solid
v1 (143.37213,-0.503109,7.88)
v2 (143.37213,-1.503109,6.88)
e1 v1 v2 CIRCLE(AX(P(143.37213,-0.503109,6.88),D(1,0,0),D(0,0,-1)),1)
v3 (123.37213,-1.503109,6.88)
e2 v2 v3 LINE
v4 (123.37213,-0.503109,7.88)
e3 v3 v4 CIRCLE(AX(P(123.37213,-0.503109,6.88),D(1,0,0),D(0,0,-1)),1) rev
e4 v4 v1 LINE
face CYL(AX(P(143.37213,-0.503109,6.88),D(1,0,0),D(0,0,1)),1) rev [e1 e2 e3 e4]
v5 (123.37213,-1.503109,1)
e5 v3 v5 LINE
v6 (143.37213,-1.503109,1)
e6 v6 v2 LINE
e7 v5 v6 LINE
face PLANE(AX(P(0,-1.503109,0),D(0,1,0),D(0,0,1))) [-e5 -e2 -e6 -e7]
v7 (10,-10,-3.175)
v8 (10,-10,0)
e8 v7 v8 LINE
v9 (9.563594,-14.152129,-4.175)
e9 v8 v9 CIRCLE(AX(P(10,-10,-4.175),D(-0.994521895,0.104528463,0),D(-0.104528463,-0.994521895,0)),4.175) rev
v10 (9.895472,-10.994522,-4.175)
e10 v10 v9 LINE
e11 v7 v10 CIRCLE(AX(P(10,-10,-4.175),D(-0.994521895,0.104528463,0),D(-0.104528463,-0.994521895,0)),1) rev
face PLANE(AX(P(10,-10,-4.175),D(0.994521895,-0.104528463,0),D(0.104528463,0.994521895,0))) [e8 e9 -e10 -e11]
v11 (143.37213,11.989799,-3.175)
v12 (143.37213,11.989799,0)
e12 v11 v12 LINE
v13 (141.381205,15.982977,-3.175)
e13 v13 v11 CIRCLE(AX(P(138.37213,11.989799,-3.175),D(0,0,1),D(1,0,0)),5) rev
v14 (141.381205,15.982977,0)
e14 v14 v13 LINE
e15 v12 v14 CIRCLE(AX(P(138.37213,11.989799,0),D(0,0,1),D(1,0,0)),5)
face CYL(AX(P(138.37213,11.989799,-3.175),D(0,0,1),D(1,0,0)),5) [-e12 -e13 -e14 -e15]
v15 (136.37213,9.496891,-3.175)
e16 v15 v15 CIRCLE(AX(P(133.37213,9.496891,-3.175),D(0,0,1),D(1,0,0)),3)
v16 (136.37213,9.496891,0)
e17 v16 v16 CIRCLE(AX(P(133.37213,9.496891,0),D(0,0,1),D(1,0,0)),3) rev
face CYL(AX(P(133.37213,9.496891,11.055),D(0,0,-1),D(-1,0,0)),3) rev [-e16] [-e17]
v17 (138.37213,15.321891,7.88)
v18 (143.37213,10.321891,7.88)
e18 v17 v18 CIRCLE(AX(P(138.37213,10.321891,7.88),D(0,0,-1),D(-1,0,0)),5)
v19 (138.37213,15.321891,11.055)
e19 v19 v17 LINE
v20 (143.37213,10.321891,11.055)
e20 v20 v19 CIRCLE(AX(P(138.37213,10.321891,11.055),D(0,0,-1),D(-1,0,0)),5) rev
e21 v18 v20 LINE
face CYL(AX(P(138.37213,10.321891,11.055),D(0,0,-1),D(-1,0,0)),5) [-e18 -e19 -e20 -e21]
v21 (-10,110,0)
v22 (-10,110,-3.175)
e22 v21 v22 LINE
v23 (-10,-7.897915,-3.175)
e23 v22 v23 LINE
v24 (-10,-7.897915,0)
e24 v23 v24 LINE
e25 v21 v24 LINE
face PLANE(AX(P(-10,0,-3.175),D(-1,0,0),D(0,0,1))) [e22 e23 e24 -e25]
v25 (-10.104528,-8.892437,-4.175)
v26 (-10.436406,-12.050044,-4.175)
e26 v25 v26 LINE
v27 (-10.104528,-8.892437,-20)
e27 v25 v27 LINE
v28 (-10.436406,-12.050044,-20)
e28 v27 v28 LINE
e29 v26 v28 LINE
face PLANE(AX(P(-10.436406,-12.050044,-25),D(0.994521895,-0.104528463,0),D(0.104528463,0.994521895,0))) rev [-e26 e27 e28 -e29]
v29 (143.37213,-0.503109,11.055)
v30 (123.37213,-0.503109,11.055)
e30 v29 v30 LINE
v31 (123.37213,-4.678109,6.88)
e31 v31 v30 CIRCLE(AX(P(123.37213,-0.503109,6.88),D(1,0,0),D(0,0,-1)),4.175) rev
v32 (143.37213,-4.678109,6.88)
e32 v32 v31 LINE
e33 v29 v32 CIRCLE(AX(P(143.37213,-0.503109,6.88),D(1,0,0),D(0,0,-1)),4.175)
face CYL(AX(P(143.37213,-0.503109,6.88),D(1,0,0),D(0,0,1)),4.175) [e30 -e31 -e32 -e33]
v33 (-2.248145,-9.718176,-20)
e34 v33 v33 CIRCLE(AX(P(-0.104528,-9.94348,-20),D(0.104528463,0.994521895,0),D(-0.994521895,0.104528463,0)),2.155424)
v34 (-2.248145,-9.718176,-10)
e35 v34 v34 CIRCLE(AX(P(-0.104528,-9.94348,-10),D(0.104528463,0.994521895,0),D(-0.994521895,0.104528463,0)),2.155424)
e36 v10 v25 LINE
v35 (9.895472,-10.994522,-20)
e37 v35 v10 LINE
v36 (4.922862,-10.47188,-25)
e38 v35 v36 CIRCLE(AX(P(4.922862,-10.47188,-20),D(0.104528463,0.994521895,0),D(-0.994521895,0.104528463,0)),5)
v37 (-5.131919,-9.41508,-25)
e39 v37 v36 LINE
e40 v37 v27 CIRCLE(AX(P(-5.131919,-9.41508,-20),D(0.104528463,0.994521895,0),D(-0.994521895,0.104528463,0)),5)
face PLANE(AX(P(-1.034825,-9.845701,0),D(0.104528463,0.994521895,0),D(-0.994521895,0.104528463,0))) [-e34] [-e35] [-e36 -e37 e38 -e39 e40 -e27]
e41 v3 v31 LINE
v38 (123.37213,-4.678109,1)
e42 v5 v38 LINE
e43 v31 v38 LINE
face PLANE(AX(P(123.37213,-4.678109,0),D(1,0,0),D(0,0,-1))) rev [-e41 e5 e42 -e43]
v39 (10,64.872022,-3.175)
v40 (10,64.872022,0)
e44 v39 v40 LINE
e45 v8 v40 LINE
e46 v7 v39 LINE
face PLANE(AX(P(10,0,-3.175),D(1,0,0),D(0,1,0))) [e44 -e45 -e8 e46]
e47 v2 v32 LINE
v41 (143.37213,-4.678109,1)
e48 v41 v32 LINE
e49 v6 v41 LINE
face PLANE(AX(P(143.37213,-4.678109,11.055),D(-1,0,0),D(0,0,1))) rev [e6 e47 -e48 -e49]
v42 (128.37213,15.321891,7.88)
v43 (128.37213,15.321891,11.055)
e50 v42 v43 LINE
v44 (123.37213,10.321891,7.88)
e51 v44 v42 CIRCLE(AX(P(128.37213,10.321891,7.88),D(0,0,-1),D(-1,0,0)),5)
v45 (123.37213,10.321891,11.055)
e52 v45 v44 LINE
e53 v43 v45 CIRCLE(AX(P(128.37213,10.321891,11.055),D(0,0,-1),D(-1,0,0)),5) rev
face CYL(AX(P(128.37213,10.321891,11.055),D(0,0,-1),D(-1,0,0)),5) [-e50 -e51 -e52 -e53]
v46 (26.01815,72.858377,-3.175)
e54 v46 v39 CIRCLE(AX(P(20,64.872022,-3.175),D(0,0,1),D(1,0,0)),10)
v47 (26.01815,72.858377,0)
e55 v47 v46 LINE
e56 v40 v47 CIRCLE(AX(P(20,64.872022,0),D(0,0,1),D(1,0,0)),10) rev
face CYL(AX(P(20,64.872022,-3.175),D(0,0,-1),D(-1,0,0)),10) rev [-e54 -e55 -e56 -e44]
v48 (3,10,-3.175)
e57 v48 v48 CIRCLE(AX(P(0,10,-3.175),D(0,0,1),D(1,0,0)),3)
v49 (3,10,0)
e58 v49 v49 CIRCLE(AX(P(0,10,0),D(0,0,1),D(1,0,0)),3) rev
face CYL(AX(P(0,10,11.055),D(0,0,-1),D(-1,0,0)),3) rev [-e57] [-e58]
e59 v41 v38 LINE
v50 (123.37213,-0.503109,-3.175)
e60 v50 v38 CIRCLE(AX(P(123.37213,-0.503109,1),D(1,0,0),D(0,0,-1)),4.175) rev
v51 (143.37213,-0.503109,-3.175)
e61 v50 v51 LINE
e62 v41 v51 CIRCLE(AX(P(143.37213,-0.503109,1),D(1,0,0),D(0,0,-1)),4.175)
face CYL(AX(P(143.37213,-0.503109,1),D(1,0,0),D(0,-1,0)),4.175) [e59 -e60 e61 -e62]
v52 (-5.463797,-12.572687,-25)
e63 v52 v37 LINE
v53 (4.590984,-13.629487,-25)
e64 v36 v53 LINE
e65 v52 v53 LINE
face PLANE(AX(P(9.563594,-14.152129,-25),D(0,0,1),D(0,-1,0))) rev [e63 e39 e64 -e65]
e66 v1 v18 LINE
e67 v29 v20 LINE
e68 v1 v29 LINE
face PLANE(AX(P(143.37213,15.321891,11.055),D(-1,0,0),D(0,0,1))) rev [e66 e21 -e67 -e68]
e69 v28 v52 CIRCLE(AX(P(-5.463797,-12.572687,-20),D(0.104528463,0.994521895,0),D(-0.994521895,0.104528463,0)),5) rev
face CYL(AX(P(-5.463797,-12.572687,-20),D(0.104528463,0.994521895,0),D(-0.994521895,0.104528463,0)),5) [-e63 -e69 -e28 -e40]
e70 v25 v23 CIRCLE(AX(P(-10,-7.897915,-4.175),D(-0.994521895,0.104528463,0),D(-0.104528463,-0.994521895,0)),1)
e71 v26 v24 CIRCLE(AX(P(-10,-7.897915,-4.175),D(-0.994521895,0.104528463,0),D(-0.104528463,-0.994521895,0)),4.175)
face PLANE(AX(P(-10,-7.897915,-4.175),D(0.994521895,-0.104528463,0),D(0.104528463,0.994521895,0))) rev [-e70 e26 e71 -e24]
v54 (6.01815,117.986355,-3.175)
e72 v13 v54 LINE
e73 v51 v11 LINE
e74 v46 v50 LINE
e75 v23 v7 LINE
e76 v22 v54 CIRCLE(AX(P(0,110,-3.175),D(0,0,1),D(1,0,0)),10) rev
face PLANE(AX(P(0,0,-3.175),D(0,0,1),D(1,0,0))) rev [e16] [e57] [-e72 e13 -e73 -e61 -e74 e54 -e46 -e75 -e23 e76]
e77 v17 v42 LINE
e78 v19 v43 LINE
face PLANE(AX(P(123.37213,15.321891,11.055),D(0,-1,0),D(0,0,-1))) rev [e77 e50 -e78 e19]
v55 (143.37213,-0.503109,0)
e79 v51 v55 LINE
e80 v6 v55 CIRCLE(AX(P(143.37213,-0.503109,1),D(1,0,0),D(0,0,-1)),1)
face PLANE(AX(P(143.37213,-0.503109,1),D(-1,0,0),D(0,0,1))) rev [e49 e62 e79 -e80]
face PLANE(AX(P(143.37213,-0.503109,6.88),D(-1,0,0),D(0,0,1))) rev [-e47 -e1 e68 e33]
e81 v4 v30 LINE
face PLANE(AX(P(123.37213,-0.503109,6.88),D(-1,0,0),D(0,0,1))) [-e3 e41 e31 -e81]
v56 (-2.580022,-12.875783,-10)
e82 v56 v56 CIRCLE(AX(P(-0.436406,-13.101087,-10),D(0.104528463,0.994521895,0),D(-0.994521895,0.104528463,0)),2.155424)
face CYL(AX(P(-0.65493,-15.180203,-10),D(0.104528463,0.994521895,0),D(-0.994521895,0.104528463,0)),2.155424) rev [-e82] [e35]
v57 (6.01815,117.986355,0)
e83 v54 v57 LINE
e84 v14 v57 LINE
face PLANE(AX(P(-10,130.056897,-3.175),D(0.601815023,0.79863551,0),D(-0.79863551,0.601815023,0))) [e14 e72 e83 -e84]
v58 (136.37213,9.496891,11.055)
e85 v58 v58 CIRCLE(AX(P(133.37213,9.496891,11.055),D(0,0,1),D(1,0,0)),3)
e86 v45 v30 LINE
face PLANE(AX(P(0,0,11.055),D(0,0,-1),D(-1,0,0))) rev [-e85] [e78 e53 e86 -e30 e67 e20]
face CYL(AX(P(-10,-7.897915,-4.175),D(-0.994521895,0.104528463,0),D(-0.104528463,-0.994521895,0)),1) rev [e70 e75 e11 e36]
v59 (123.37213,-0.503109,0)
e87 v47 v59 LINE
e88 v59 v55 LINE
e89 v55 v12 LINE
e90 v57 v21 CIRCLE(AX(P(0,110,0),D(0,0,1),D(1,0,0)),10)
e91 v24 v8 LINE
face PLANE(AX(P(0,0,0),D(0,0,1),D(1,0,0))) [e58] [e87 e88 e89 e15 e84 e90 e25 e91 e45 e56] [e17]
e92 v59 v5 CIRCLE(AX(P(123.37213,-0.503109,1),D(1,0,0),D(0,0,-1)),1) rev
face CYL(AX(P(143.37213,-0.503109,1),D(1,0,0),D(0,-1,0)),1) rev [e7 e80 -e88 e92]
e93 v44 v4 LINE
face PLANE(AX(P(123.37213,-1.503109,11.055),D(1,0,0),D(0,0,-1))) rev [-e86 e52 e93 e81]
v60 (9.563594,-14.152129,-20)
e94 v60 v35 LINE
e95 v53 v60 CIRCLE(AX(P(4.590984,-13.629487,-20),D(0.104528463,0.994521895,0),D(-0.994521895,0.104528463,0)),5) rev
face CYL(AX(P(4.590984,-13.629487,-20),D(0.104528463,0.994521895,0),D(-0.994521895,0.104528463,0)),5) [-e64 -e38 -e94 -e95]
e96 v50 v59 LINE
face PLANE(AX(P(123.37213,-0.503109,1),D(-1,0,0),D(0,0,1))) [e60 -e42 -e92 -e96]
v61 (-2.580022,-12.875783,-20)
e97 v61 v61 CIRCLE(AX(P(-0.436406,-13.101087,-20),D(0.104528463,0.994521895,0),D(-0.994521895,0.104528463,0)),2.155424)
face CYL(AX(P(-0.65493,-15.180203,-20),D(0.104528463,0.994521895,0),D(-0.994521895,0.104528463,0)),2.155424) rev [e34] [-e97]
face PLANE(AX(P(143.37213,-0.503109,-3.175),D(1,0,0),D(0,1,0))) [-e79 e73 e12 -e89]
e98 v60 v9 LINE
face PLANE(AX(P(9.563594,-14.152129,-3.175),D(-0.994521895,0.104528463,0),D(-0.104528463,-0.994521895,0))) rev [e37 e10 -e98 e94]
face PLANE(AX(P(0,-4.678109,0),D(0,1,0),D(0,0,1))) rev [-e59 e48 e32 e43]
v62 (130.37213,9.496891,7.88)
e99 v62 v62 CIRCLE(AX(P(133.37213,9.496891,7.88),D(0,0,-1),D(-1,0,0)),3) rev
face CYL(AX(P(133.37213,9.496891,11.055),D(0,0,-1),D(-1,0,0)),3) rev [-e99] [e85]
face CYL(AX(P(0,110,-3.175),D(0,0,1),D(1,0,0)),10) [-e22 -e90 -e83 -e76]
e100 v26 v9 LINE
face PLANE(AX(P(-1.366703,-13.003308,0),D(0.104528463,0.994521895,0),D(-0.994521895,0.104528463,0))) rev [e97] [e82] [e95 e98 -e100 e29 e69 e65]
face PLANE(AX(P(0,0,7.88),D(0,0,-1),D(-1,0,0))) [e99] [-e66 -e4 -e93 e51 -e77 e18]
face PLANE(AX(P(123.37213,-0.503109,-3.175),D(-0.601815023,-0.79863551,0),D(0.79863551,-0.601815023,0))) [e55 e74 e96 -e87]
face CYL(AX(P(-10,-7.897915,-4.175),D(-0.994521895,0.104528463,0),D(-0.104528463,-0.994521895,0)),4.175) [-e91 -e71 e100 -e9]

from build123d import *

# Parameters (mm, degrees)
BASE_FLANGE1_DEPTH           = 3.175
EDGE_FLANGE3_DEPTH           = 20
EDGE_FLANGE4_STRIP_W         = 14.7
EDGE_FLANGE4_STRIP_H         = 3.175
EDGE_FLANGE4_STRIP_CUT_DEPTH = 20
EDGE_FLANGE4_DEPTH           = 20
CUT_EXTRUDE1_DEPTH           = 194.888053308
CUT_EXTRUDE1_DEPTH_BACK      = 194.888053308
SKETCH12_R                   = 3
TAB1_DEPTH                   = 3.175
EDGE_FLANGE5_DEPTH           = 20.110165591
FILLET1_R                    = 10
FILLET2_R                    = 5
SKETCH27_R                   = 2.155423697
CUT_EXTRUDE2_DEPTH           = 196.8016212


# Sheet-metal steps are written as plain solids
with BuildPart() as part:
    # Sketch1 → Base-Flange1 (new body)
    with BuildSketch(Plane.XY):
        Polygon((10, 0), (10, 84.928918998), (123.372130178, -0.503108866), (143.372130178, -0.503108866), (143.372130178, 14.482707214), (-10, 130.056897083), (-10, 0), align=None)
    extrude(amount=-BASE_FLANGE1_DEPTH)

    # Edge-Flange3 section (across the edge) → Edge-Flange3 (add)
    with BuildSketch(Plane(origin=(123.372130178, -1.503108866, 0), x_dir=(0, 1, 0), z_dir=(1, 0, 0))):
        with BuildLine():
            Line((-3.175, 1), (-3.175, 11.055))
            Line((-3.175, 11.055), (0, 11.055))
            Line((0, 11.055), (0, 1))
            ThreePointArc((0, 1), (0.292893219, 0.292893219), (1, 0))
            Line((1, 0), (1, -3.175))
            ThreePointArc((1, -3.175), (-1.952170811, -1.952170811), (-3.175, 1))
        make_face()
    extrude(amount=EDGE_FLANGE3_DEPTH)

    # Edge-Flange4 strip (across the edge) → Edge-Flange4 strip cut (cut)
    with BuildSketch(Plane(origin=(123.372130178, -1.503108866, 11.055), x_dir=(0, 0, -1), z_dir=(1, 0, 0))):
        with Locations((-3.175, -1.5875)):
            Rectangle(EDGE_FLANGE4_STRIP_W, EDGE_FLANGE4_STRIP_H)
    extrude(amount=EDGE_FLANGE4_STRIP_CUT_DEPTH, mode=Mode.SUBTRACT)

    # Edge-Flange4 section (across the edge) → Edge-Flange4 (add)
    with BuildSketch(Plane(origin=(123.372130178, -1.503108866, 11.055), x_dir=(0, 0, -1), z_dir=(1, 0, 0))):
        with BuildLine():
            Line((0, 1), (0, 16.825))
            Line((0, 16.825), (3.175, 16.825))
            Line((3.175, 16.825), (3.175, 1))
            ThreePointArc((3.175, 1), (3.467893219, 0.292893219), (4.175, 0))
            Line((4.175, 0), (4.175, -3.175))
            ThreePointArc((4.175, -3.175), (1.222829189, -1.952170811), (0, 1))
        make_face()
    extrude(amount=EDGE_FLANGE4_DEPTH)

    # Sketch12 → Cut-Extrude1 (cut, two sides: drawn at the far end of the back side and taken through both)
    with BuildSketch(Plane.XY.offset(-CUT_EXTRUDE1_DEPTH_BACK)):
        with Locations(Location((133.372130178, 9.496891134, 0), (0, 0, 180))):
            Circle(SKETCH12_R)
        with Locations((0, 10)):
            Circle(SKETCH12_R)
    extrude(amount=CUT_EXTRUDE1_DEPTH + CUT_EXTRUDE1_DEPTH_BACK, mode=Mode.SUBTRACT)

    # Sketch19 → Tab1 (add)
    with BuildSketch(Plane.XY):
        Polygon((-10, 0), (10, 0), (10, -10), (-10, -7.897915295), align=None)
    extrude(amount=-TAB1_DEPTH)

    # Edge-Flange5 section (across the edge) → Edge-Flange5 (add)
    with BuildSketch(Plane(origin=(9.895471537, -10.994521895, -3.175), x_dir=(0.10452846326765029, 0.9945218953682737, -3.4914813388431334e-15), z_dir=(-0.9945218953682737, 0.10452846326765029, 0))):
        with BuildLine():
            Line((-3.175, 1), (-3.175, 21.825))
            Line((-3.175, 21.825), (0, 21.825))
            Line((0, 21.825), (0, 1))
            ThreePointArc((0, 1), (0.292893219, 0.292893219), (1, 0))
            Line((1, 0), (1, -3.175))
            ThreePointArc((1, -3.175), (-1.952170811, -1.952170811), (-3.175, 1))
        make_face()
    extrude(amount=EDGE_FLANGE5_DEPTH)

    # Fillet1
    fillet1_edges = [part.edges().sort_by_distance(p)[0] for p in [
        (-10, 130.056897083, -1.5875),
        (10, 84.928918998, -1.5875),
    ]]
    fillet(fillet1_edges, radius=FILLET1_R)

    # Fillet2
    fillet2_edges = [part.edges().sort_by_distance(p)[0] for p in [
        (9.729532601, -12.573325404, -25),
        (-10.270467399, -10.471240699, -25),
        (143.372130178, 14.482707214, -1.5875),
        (123.372130178, 15.321891134, 9.4675),
        (143.372130178, 15.321891134, 9.4675),
    ]]
    fillet(fillet2_edges, radius=FILLET2_R)

    # Sketch27 → Cut-Extrude2 (cut, through all)
    with BuildSketch(Plane(origin=(-1.034824921, -9.845701445, 0), x_dir=(0.9945218953682736, -0.10452846326765024, 0), z_dir=(0.10452846326765025, 0.9945218953682737, -3.503032532656101e-15))):
        with Locations(Location((0.935420791, 20, 0), (0, 0, 180))):
            Circle(SKETCH27_R)
        with Locations(Location((0.935420791, 10, 0), (0, 0, 180))):
            Circle(SKETCH27_R)
    extrude(amount=-CUT_EXTRUDE2_DEPTH, mode=Mode.SUBTRACT)


solid = part.part
